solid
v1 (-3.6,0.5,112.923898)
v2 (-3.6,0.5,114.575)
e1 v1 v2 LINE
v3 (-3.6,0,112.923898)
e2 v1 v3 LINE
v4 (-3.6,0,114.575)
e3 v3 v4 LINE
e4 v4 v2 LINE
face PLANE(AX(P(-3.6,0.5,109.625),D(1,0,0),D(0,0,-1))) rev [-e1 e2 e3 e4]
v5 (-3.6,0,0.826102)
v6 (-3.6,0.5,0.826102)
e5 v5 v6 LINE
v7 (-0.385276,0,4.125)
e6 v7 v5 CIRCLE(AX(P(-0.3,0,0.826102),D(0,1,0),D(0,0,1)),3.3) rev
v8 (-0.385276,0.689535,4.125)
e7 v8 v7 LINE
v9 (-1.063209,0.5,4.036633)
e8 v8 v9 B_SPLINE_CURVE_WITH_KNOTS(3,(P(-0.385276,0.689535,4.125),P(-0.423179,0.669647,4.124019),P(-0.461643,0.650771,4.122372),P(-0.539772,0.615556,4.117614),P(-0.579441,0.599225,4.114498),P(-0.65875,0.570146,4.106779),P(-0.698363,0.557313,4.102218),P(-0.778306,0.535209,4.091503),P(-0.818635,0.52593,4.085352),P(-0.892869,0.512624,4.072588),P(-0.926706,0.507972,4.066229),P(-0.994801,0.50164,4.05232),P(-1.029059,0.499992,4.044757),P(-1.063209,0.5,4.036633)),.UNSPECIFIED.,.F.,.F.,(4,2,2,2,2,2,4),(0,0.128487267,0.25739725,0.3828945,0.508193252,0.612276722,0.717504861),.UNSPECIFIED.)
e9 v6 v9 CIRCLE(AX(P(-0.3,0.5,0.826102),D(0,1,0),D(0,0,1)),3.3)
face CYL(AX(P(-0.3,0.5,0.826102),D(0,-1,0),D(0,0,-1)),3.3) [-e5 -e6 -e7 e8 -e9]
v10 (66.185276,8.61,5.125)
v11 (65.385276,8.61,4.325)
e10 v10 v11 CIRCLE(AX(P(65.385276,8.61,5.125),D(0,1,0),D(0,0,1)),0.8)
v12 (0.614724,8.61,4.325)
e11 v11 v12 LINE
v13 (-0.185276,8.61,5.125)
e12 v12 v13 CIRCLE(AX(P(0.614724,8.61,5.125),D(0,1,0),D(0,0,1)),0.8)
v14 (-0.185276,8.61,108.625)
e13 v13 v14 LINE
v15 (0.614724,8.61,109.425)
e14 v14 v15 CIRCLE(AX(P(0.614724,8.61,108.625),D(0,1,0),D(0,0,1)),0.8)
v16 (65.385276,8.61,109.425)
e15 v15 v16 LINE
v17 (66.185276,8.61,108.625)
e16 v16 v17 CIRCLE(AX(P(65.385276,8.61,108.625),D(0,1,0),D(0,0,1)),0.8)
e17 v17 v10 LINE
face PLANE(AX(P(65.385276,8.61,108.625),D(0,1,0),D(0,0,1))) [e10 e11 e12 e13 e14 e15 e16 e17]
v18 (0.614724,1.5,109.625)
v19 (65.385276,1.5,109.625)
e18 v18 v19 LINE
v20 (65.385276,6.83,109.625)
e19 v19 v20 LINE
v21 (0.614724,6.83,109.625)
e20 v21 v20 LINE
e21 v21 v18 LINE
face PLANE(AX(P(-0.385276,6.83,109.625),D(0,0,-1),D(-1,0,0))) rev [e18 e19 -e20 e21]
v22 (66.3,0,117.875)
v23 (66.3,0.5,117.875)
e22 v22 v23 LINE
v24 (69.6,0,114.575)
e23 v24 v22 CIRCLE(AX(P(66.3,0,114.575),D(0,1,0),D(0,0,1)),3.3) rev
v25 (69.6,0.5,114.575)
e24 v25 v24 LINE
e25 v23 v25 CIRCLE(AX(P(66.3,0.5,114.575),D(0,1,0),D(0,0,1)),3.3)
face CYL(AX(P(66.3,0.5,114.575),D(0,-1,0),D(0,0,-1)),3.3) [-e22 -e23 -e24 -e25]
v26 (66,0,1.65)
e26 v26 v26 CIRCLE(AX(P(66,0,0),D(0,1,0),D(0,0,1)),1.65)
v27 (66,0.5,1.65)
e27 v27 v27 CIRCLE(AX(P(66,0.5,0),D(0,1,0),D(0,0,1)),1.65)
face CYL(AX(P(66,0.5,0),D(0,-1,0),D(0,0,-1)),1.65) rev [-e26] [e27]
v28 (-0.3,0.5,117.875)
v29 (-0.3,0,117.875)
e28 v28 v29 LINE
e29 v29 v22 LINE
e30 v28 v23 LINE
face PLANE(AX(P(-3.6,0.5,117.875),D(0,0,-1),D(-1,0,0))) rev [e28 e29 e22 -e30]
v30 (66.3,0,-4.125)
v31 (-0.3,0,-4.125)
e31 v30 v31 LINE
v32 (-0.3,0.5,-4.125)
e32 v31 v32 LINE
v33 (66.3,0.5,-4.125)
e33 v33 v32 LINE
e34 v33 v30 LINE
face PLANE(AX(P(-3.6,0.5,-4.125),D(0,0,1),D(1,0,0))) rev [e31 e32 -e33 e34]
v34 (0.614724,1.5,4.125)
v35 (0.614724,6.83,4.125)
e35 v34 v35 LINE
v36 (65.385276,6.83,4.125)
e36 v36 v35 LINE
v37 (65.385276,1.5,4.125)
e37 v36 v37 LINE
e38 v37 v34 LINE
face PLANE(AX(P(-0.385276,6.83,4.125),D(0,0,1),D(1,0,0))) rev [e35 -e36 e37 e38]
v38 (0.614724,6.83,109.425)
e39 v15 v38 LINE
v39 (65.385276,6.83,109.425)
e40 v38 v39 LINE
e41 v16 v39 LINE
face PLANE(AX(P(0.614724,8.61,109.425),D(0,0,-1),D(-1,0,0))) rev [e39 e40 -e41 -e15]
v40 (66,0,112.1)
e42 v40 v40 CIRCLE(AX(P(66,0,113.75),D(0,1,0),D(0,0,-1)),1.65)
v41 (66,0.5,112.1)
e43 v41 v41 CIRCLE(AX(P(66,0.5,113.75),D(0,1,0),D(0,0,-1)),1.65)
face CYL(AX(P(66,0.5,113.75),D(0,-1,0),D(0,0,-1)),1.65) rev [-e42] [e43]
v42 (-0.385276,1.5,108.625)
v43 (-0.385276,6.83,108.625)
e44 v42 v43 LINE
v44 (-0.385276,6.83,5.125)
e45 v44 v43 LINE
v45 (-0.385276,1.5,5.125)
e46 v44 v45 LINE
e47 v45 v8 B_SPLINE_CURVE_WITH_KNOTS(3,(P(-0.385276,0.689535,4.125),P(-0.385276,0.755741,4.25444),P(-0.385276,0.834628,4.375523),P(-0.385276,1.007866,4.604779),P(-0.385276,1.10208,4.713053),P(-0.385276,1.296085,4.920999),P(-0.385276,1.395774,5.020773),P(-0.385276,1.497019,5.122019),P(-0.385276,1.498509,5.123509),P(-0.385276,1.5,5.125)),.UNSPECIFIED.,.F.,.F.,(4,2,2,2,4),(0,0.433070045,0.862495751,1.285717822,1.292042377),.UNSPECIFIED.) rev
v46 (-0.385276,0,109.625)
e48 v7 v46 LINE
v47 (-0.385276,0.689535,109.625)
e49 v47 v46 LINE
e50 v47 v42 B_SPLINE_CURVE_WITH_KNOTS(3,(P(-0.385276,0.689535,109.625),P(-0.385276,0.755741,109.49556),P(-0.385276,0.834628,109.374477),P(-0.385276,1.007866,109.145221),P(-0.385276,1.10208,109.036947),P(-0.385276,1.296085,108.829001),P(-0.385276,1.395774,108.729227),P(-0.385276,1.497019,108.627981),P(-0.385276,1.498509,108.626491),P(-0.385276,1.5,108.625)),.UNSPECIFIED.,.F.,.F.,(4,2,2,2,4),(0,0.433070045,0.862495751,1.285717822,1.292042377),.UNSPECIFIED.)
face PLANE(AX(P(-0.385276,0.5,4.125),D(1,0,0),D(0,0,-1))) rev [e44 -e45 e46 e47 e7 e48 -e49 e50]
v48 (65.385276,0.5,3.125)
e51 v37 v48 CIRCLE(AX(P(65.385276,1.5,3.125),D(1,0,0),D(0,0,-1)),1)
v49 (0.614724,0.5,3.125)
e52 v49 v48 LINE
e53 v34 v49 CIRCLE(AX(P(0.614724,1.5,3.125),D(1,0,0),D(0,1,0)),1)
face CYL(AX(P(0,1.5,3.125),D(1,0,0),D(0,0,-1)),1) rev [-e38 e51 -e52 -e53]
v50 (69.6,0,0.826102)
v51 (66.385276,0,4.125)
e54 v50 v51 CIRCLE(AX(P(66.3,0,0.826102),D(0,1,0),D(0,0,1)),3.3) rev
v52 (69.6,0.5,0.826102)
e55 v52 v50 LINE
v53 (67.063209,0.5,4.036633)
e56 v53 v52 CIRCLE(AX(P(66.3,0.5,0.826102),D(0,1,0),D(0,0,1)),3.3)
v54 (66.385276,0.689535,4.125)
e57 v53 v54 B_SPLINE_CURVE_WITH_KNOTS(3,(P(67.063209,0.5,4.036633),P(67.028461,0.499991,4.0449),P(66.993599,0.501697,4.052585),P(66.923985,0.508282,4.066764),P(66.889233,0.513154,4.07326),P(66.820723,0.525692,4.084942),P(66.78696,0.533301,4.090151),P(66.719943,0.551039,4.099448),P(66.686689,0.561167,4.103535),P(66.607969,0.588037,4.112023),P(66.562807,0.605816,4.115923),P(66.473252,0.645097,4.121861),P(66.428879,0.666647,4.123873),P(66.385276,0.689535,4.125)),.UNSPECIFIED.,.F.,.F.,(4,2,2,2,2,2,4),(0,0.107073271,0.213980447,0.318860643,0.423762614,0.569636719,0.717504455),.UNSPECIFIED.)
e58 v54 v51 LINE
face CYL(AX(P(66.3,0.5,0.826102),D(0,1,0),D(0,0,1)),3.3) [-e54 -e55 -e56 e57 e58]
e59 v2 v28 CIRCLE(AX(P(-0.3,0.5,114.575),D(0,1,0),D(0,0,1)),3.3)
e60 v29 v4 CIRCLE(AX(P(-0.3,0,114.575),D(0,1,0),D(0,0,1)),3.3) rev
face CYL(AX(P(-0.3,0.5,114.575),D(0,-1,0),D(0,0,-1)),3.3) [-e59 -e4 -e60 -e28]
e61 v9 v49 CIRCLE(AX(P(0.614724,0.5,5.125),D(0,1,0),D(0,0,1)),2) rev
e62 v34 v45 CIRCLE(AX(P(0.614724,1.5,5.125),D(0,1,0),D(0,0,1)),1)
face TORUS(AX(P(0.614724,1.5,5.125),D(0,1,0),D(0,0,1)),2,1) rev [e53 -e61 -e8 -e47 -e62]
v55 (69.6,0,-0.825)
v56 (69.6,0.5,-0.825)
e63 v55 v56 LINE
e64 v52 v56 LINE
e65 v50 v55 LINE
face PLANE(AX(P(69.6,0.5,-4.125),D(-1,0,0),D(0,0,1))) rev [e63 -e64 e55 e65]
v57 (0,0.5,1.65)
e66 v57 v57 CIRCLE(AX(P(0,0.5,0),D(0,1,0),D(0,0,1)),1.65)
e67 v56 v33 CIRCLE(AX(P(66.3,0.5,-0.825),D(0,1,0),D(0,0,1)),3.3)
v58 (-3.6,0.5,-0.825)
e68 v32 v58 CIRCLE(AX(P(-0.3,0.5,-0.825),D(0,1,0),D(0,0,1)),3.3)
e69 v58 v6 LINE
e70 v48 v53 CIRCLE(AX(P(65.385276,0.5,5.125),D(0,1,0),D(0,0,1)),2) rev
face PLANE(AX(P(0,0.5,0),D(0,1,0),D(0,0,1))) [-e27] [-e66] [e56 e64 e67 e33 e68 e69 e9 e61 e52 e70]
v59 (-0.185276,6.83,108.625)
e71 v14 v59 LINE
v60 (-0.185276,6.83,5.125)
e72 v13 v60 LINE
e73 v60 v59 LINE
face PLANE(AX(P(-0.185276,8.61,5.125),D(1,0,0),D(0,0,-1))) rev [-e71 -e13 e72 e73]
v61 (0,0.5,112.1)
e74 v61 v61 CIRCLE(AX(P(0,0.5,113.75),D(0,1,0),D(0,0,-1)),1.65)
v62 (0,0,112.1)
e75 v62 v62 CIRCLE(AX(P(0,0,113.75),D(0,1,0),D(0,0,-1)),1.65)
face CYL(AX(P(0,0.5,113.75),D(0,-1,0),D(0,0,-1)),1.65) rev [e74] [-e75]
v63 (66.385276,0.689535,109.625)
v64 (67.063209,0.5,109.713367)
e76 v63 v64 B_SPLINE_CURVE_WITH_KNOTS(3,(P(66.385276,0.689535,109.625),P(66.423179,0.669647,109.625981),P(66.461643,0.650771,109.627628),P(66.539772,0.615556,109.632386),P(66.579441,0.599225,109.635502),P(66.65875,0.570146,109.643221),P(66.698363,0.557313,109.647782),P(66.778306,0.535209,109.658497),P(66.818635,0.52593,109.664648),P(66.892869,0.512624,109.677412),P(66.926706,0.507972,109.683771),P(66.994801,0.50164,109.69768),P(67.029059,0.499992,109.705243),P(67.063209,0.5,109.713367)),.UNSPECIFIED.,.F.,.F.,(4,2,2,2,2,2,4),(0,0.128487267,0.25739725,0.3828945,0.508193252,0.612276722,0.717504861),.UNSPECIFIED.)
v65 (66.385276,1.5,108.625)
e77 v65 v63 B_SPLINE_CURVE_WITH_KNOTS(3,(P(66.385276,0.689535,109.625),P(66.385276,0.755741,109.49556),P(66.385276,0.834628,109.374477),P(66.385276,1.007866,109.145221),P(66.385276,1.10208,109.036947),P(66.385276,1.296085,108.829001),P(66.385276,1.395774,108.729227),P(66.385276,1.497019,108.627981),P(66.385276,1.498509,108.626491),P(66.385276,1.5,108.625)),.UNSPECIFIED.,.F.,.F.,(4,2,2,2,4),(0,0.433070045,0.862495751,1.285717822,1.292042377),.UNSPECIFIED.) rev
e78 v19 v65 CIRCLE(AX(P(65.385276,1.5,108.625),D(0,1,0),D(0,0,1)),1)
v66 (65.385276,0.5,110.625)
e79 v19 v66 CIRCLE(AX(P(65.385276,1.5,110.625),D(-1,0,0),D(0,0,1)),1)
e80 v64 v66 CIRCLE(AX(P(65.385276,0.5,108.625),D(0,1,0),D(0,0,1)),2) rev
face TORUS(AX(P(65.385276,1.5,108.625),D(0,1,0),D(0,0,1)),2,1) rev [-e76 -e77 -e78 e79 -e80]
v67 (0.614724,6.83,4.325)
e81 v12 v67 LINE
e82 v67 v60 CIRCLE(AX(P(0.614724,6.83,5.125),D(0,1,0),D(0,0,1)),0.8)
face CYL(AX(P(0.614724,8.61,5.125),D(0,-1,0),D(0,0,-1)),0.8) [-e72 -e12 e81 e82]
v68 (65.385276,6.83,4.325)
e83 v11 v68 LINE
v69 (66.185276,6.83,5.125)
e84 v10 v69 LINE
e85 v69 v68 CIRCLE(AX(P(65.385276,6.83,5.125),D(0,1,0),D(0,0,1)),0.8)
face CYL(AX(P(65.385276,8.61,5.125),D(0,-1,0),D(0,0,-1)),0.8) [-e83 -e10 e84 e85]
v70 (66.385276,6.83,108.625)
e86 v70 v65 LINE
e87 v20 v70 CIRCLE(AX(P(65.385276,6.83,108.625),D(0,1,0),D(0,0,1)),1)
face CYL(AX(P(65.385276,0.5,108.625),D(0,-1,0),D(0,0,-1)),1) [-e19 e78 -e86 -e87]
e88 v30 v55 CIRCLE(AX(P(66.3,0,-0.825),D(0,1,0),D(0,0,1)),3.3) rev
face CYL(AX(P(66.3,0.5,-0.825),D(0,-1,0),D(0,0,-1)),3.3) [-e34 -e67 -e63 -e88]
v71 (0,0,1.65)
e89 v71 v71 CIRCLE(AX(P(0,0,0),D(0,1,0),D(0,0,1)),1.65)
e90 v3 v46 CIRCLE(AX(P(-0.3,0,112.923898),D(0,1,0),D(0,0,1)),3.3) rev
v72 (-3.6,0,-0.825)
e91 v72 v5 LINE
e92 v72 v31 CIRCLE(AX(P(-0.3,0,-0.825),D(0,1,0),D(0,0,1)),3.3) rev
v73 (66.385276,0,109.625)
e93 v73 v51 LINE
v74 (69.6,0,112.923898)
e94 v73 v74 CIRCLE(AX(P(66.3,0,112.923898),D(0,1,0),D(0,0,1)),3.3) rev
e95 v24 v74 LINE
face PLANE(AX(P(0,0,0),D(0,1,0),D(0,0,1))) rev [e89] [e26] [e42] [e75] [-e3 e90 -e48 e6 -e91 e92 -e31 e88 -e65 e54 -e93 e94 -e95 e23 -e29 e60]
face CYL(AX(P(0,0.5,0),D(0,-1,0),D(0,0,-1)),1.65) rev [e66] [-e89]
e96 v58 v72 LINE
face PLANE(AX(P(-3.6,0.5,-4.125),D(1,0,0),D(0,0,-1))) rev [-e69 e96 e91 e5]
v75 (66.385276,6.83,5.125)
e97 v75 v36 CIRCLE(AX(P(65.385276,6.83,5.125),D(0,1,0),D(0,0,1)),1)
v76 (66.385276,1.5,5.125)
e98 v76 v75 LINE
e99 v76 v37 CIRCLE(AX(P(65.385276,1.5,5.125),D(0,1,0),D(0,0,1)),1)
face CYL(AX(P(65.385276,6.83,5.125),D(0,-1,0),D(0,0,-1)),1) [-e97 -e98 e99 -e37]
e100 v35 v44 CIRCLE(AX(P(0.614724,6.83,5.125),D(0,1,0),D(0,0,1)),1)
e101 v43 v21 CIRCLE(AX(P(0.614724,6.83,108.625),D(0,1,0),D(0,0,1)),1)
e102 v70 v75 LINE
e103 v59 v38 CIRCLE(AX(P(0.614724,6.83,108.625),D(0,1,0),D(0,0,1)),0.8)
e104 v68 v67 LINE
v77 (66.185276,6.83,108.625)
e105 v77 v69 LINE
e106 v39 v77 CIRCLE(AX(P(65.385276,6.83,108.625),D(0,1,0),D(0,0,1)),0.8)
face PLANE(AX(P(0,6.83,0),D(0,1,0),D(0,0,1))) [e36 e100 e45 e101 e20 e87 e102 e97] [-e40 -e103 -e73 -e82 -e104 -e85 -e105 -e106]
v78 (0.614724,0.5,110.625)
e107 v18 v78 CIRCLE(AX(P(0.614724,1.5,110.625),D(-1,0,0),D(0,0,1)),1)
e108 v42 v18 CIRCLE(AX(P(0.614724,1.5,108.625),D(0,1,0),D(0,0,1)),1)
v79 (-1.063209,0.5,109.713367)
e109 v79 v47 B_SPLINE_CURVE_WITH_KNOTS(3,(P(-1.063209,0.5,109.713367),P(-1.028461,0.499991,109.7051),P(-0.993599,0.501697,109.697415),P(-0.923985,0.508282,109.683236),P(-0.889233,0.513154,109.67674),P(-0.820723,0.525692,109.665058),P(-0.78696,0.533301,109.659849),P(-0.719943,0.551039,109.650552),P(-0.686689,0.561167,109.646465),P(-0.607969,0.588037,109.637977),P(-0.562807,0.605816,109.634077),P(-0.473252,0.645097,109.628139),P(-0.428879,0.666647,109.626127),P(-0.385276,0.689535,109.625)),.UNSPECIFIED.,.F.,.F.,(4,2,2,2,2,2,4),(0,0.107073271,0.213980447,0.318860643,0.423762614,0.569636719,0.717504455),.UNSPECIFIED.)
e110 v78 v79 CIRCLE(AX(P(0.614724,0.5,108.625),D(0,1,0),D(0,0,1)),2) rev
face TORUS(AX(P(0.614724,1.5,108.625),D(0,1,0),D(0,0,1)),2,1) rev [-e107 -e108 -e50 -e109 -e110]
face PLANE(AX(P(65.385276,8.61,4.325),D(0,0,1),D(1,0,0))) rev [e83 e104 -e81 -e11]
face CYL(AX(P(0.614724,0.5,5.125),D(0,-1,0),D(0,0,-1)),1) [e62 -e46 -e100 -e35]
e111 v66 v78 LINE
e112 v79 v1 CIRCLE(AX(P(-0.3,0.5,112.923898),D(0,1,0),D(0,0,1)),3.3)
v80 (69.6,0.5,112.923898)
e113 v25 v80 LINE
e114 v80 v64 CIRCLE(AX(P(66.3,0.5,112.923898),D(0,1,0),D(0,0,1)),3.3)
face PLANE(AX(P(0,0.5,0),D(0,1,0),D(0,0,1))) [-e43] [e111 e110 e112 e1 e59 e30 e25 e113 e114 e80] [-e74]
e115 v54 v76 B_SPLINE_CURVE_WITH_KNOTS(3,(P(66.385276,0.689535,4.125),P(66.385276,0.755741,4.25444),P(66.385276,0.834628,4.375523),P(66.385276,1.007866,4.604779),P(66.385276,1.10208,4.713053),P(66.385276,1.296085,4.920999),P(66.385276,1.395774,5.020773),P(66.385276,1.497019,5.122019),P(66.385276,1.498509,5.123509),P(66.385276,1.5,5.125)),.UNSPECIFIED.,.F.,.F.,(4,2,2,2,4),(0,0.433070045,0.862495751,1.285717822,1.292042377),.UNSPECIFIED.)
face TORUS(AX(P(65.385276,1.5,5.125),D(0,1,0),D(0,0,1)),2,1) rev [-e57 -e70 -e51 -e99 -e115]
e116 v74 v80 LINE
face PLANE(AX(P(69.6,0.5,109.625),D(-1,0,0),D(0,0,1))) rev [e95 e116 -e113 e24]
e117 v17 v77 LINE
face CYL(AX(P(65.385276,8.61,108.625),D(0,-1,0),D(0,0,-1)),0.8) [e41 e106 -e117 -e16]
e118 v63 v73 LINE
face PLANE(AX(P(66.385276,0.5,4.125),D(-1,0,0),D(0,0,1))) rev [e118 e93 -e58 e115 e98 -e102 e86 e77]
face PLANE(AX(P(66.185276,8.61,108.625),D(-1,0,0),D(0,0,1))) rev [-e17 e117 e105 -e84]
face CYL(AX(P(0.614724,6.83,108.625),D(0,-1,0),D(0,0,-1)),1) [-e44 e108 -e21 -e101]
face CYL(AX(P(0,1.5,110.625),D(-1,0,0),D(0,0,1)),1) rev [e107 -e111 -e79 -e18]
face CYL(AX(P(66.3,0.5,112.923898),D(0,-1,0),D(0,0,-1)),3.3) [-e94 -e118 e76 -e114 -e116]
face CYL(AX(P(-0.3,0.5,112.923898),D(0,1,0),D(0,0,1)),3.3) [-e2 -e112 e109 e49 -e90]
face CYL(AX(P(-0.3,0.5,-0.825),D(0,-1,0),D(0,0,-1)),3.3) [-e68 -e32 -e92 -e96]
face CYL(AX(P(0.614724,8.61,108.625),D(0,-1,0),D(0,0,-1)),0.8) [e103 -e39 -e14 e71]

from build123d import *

# Parameters (mm, degrees)
SKETCH_1_R      = 1.65
EXTRUDE_1_DEPTH = 0.5
FILLET_1_R      = 3.3
SKETCH_2_W      = 66.770552446
SKETCH_2_H      = 105.5
EXTRUDE_2_DEPTH = 6.83
FILLET_2_R      = 1
EXTRUDE_3_DEPTH = 1.78
FILLET_3_R      = 1


with BuildPart() as part:
    # 草图1 → 凸台-拉伸1 (new body)
    with BuildSketch(Plane(origin=(0, 0, 0), x_dir=(1, 0, 0), z_dir=(0, 1, 0))):
        Polygon((66.385276223, -4.125), (69.6, -4.125), (69.6, 4.125), (-3.6, 4.125), (-3.6, -4.125), (-0.385276223, -4.125), (-0.385276223, -109.625), (-3.6, -109.625), (-3.6, -117.875), (69.6, -117.875), (69.6, -109.625), (66.385276223, -109.625), align=None)
        with Locations(Location((0, 0, 0), (0, 0, 270))):
            Circle(SKETCH_1_R, mode=Mode.SUBTRACT)
        with Locations(Location((66, 0, 0), (0, 0, 270))):
            Circle(SKETCH_1_R, mode=Mode.SUBTRACT)
        with Locations(Location((66, -113.75, 0), (0, 0, 90))):
            Circle(SKETCH_1_R, mode=Mode.SUBTRACT)
        with Locations(Location((0, -113.75, 0), (0, 0, 90))):
            Circle(SKETCH_1_R, mode=Mode.SUBTRACT)
    extrude(amount=EXTRUDE_1_DEPTH)

    # 圆角1
    # the kernel refuses this fillet: 3.3 mm, written as the material it takes off along each edge
    with BuildSketch(Plane(origin=(69.6, -8.247244982, 109.625), x_dir=(0, 0, 1), z_dir=(0, 1, 0)), Plane(origin=(-3.6, -8.247244982, 4.125), x_dir=(0, 0, -1), z_dir=(0, 1, 0))) as fillet_1_piece_1:
        with BuildLine():
            CenterArc((3.298897993, -3.3), FILLET_1_R, 90, 88.519238897)
            Line((0, -3.214723777), (-0.06597796, -3.213018252))
            ThreePointArc((-0.06597796, -3.213018252), (-0.066, -1.607361888), (-0.066, 0))
            Line((-0.066, 0), (0, 0.066))
            Line((0, 0.066), (3.298897993, 0.066))
            Line((3.298897993, 0.066), (3.298897993, 0))
        make_face()
    extrude(amount=16.994489963, mode=Mode.SUBTRACT)
    with BuildSketch(Plane(origin=(69.6, -8.25, 117.875), x_dir=(-1, 0, 0), z_dir=(0, 1, 0)), Plane(origin=(-3.6, -8.25, 117.875), x_dir=(0, 0, -1), z_dir=(0, 1, 0)), Plane(origin=(-3.6, -8.25, -4.125), x_dir=(1, 0, 0), z_dir=(0, 1, 0)), Plane(origin=(69.6, -8.25, -4.125), x_dir=(0, 0, 1), z_dir=(0, 1, 0))) as fillet_1_piece_2:
        with BuildLine():
            CenterArc((FILLET_1_R, -FILLET_1_R), FILLET_1_R, 90, 90)
            Line((0, -FILLET_1_R), (-FILLET_1_R * 0.02, -FILLET_1_R))
            Line((-FILLET_1_R * 0.02, -FILLET_1_R), (-FILLET_1_R * 0.02, FILLET_1_R * 0.02))
            Line((-FILLET_1_R * 0.02, FILLET_1_R * 0.02), (FILLET_1_R, FILLET_1_R * 0.02))
            Line((FILLET_1_R, FILLET_1_R * 0.02), (FILLET_1_R, 0))
        make_face()
    extrude(amount=17, mode=Mode.SUBTRACT)
    with BuildSketch(Plane(origin=(-3.6, -8.247244982, 109.625), x_dir=(1, 0, 0), z_dir=(0, 1, 0)), Plane(origin=(69.6, -8.247244982, 4.125), x_dir=(-1, 0, 0), z_dir=(0, 1, 0))) as fillet_1_piece_3:
        with BuildLine():
            CenterArc((3.3, -3.298897993), FILLET_1_R, 91.480761103, 88.519238897)
            Line((0, -3.298897993), (-0.066, -3.298897993))
            Line((-0.066, -3.298897993), (-0.066, 0))
            Line((-0.066, 0), (0, 0.066))
            ThreePointArc((0, 0.066), (1.607361888, 0.066), (3.213018252, 0.06597796))
            Line((3.213018252, 0.06597796), (3.214723777, 0))
        make_face()
    extrude(amount=16.994489963, mode=Mode.SUBTRACT)

    # 草图2 → 凸台-拉伸2 (add)
    with BuildSketch(Plane(origin=(0, 0, 0), x_dir=(1, 0, 0), z_dir=(0, 1, 0))):
        with Locations((33, -56.875)):
            Rectangle(SKETCH_2_W, SKETCH_2_H)
    extrude(amount=EXTRUDE_2_DEPTH)

    # 圆角2
    fillet_2_edges = [part.edges().sort_by_distance(p)[0] for p in [
        (-0.385276223, 3.665, 4.125),
        (-0.385276223, 3.665, 109.625),
        (66.385276223, 3.665, 109.625),
        (66.385276223, 3.665, 4.125),
    ]]
    fillet(fillet_2_edges, radius=FILLET_2_R)

    # 草图3 → 凸台-拉伸3 (add)
    with BuildSketch(Plane(origin=(0, 6.83, 0), x_dir=(1, 0, 0), z_dir=(0, 1, 0))):
        with BuildLine():
            Line((66.185276223, -108.625), (66.185276223, -5.125))
            ThreePointArc((66.185276223, -5.125), (65.950961648, -4.559314575), (65.385276223, -4.325))
            Line((65.385276223, -4.325), (0.614723777, -4.325))
            ThreePointArc((0.614723777, -4.325), (0.049038352, -4.559314575), (-0.185276223, -5.125))
            Line((-0.185276223, -5.125), (-0.185276223, -108.625))
            ThreePointArc((-0.185276223, -108.625), (0.049038352, -109.190685425), (0.614723777, -109.425))
            Line((0.614723777, -109.425), (65.385276223, -109.425))
            ThreePointArc((65.385276223, -109.425), (65.950961648, -109.190685425), (66.185276223, -108.625))
        make_face()
    extrude(amount=EXTRUDE_3_DEPTH)

    # 圆角3
    # the kernel refuses this fillet: 1 mm, written as the material it adds along each edge
    with BuildSketch(Plane(origin=(65.385276223, 0.5, 108.625), x_dir=(-0.8017442392976621, 0, -0.5976672776328089), z_dir=(-0.5976672776328089, 0, 0.8017442392976621))) as fillet_3_piece_1_section:
        with BuildLine():
            CenterArc((1 + FILLET_3_R, -FILLET_3_R), FILLET_3_R, 90, 90)
            Line((1 + FILLET_3_R, 0), (1, 0))
            Line((1, 0), (1, -FILLET_3_R))
        make_face()
    fillet_3_piece_1 = revolve(axis=Axis((65.385276223, 0.5, 108.625), (0, -1, 0)), revolution_arc=233.296989237, mode=Mode.PRIVATE)
    fillet_3_piece_1 = split(fillet_3_piece_1, bisect_by=Plane(origin=(66.385276223, 0.811675846, 109.374877518), z_dir=(-1, 0, 0)), keep=Keep.TOP, mode=Mode.PRIVATE)
    add(fillet_3_piece_1)
    with BuildSketch(Plane(origin=(65.385276223, 0.5, 108.625), x_dir=(-0.8017442392976621, 0, -0.5976672776328089), z_dir=(-0.5976672776328089, 0, 0.8017442392976621))) as fillet_3_piece_2_section:
        with BuildLine():
            CenterArc((1 + FILLET_3_R, -FILLET_3_R), FILLET_3_R, 90, 90)
            Line((1 + FILLET_3_R, 0), (1, 0))
            Line((1, 0), (1, -FILLET_3_R))
        make_face()
    fillet_3_piece_2 = revolve(axis=Axis((65.385276223, 0.5, 108.625), (0, -1, 0)), revolution_arc=233.296989237, mode=Mode.PRIVATE)
    fillet_3_piece_2 = fillet_3_piece_2 & Plane(origin=(66.3, 0.537437966, 112.923897993), x_dir=(0, 0, 1), z_dir=(0, -1, 0)) * Cylinder(3.3, 8, mode=Mode.PRIVATE)
    add(fillet_3_piece_2)
    with BuildSketch(Plane(origin=(0.614723777, 0.5, 108.625), x_dir=(0.8017442392976509, 0, -0.597667277632824), z_dir=(0.597667277632824, 0, 0.8017442392976509))) as fillet_3_piece_3_section:
        with BuildLine():
            CenterArc((1 + FILLET_3_R, FILLET_3_R), FILLET_3_R, 180, 90)
            Line((1, FILLET_3_R), (1, 0))
            Line((1, 0), (1 + FILLET_3_R, 0))
        make_face()
    fillet_3_piece_3 = revolve(axis=Axis((0.614723777, 0.5, 108.625), (0, 1, 0)), revolution_arc=233.296989237, mode=Mode.PRIVATE)
    fillet_3_piece_3 = split(fillet_3_piece_3, bisect_by=Plane(origin=(-0.385276223, 0.811675592, 109.374877608), z_dir=(1, 0, 0)), keep=Keep.TOP, mode=Mode.PRIVATE)
    add(fillet_3_piece_3)
    with BuildSketch(Plane(origin=(0.614723777, 0.5, 108.625), x_dir=(0.8017442392976509, 0, -0.597667277632824), z_dir=(0.597667277632824, 0, 0.8017442392976509))) as fillet_3_piece_4_section:
        with BuildLine():
            CenterArc((1 + FILLET_3_R, FILLET_3_R), FILLET_3_R, 180, 90)
            Line((1, FILLET_3_R), (1, 0))
            Line((1, 0), (1 + FILLET_3_R, 0))
        make_face()
    fillet_3_piece_4 = revolve(axis=Axis((0.614723777, 0.5, 108.625), (0, 1, 0)), revolution_arc=233.296989237, mode=Mode.PRIVATE)
    fillet_3_piece_4 = fillet_3_piece_4 & Plane(origin=(-0.3, 0.537437971, 112.923897993), x_dir=(1, 0, 0), z_dir=(0, -1, 0)) * Cylinder(3.3, 8, mode=Mode.PRIVATE)
    add(fillet_3_piece_4)
    with BuildSketch(Plane(origin=(0.614723777, 0.5, 5.125), x_dir=(0.8017442392976485, 0, 0.5976672776328273), z_dir=(0.5976672776328273, 0, -0.8017442392976485))) as fillet_3_piece_5_section:
        with BuildLine():
            CenterArc((1 + FILLET_3_R, -FILLET_3_R), FILLET_3_R, 90, 90)
            Line((1, -FILLET_3_R), (1, 0))
            Line((1, 0), (1 + FILLET_3_R, 0))
        make_face()
    fillet_3_piece_5 = revolve(axis=Axis((0.614723777, 0.5, 5.125), (0, -1, 0)), revolution_arc=233.296989237, mode=Mode.PRIVATE)
    fillet_3_piece_5 = split(fillet_3_piece_5, bisect_by=Plane(origin=(-0.385276223, 0.811675846, 4.375122482), z_dir=(1, 0, 0)), keep=Keep.TOP, mode=Mode.PRIVATE)
    add(fillet_3_piece_5)
    with BuildSketch(Plane(origin=(0.614723777, 0.5, 5.125), x_dir=(0.8017442392976485, 0, 0.5976672776328273), z_dir=(0.5976672776328273, 0, -0.8017442392976485))) as fillet_3_piece_6_section:
        with BuildLine():
            CenterArc((1 + FILLET_3_R, -FILLET_3_R), FILLET_3_R, 90, 90)
            Line((1, -FILLET_3_R), (1, 0))
            Line((1, 0), (1 + FILLET_3_R, 0))
        make_face()
    fillet_3_piece_6 = revolve(axis=Axis((0.614723777, 0.5, 5.125), (0, -1, 0)), revolution_arc=233.296989237, mode=Mode.PRIVATE)
    fillet_3_piece_6 = fillet_3_piece_6 & Plane(origin=(-0.3, 0.537437966, 0.826102007), x_dir=(0, 0, -1), z_dir=(0, -1, 0)) * Cylinder(3.3, 8, mode=Mode.PRIVATE)
    add(fillet_3_piece_6)
    with BuildSketch(Plane(origin=(65.385276223, 0.5, 5.125), x_dir=(-0.801744239297651, 0, 0.5976672776328237), z_dir=(-0.5976672776328237, 0, -0.801744239297651))) as fillet_3_piece_7_section:
        with BuildLine():
            CenterArc((1 + FILLET_3_R, FILLET_3_R), FILLET_3_R, 180, 90)
            Line((1 + FILLET_3_R, 0), (1, 0))
            Line((1, 0), (1, FILLET_3_R))
        make_face()
    fillet_3_piece_7 = revolve(axis=Axis((65.385276223, 0.5, 5.125), (0, 1, 0)), revolution_arc=233.296989237, mode=Mode.PRIVATE)
    fillet_3_piece_7 = split(fillet_3_piece_7, bisect_by=Plane(origin=(66.385276223, 0.811675555, 4.375122379), z_dir=(-1, 0, 0)), keep=Keep.TOP, mode=Mode.PRIVATE)
    add(fillet_3_piece_7)
    with BuildSketch(Plane(origin=(65.385276223, 0.5, 5.125), x_dir=(-0.801744239297651, 0, 0.5976672776328237), z_dir=(-0.5976672776328237, 0, -0.801744239297651))) as fillet_3_piece_8_section:
        with BuildLine():
            CenterArc((1 + FILLET_3_R, FILLET_3_R), FILLET_3_R, 180, 90)
            Line((1 + FILLET_3_R, 0), (1, 0))
            Line((1, 0), (1, FILLET_3_R))
        make_face()
    fillet_3_piece_8 = revolve(axis=Axis((65.385276223, 0.5, 5.125), (0, 1, 0)), revolution_arc=233.296989237, mode=Mode.PRIVATE)
    fillet_3_piece_8 = fillet_3_piece_8 & Plane(origin=(66.3, 0.537437971, 0.826102007), x_dir=(-1, 0, 0), z_dir=(0, -1, 0)) * Cylinder(3.3, 8, mode=Mode.PRIVATE)
    add(fillet_3_piece_8)
    with BuildSketch(Plane(origin=(0.614723777, 0.5, 109.625), x_dir=(0, 0, 1), z_dir=(1, 0, 0)), Plane(origin=(65.385276223, 0.5, 4.125), x_dir=(0, 0, -1), z_dir=(-1, 0, 0))) as fillet_3_piece_9:
        with BuildLine():
            CenterArc((FILLET_3_R, -FILLET_3_R), FILLET_3_R, 90, 90)
            Line((0, -FILLET_3_R), (0, 0))
            Line((0, 0), (FILLET_3_R, 0))
        make_face()
    extrude(amount=64.770552447)


solid = part.part
